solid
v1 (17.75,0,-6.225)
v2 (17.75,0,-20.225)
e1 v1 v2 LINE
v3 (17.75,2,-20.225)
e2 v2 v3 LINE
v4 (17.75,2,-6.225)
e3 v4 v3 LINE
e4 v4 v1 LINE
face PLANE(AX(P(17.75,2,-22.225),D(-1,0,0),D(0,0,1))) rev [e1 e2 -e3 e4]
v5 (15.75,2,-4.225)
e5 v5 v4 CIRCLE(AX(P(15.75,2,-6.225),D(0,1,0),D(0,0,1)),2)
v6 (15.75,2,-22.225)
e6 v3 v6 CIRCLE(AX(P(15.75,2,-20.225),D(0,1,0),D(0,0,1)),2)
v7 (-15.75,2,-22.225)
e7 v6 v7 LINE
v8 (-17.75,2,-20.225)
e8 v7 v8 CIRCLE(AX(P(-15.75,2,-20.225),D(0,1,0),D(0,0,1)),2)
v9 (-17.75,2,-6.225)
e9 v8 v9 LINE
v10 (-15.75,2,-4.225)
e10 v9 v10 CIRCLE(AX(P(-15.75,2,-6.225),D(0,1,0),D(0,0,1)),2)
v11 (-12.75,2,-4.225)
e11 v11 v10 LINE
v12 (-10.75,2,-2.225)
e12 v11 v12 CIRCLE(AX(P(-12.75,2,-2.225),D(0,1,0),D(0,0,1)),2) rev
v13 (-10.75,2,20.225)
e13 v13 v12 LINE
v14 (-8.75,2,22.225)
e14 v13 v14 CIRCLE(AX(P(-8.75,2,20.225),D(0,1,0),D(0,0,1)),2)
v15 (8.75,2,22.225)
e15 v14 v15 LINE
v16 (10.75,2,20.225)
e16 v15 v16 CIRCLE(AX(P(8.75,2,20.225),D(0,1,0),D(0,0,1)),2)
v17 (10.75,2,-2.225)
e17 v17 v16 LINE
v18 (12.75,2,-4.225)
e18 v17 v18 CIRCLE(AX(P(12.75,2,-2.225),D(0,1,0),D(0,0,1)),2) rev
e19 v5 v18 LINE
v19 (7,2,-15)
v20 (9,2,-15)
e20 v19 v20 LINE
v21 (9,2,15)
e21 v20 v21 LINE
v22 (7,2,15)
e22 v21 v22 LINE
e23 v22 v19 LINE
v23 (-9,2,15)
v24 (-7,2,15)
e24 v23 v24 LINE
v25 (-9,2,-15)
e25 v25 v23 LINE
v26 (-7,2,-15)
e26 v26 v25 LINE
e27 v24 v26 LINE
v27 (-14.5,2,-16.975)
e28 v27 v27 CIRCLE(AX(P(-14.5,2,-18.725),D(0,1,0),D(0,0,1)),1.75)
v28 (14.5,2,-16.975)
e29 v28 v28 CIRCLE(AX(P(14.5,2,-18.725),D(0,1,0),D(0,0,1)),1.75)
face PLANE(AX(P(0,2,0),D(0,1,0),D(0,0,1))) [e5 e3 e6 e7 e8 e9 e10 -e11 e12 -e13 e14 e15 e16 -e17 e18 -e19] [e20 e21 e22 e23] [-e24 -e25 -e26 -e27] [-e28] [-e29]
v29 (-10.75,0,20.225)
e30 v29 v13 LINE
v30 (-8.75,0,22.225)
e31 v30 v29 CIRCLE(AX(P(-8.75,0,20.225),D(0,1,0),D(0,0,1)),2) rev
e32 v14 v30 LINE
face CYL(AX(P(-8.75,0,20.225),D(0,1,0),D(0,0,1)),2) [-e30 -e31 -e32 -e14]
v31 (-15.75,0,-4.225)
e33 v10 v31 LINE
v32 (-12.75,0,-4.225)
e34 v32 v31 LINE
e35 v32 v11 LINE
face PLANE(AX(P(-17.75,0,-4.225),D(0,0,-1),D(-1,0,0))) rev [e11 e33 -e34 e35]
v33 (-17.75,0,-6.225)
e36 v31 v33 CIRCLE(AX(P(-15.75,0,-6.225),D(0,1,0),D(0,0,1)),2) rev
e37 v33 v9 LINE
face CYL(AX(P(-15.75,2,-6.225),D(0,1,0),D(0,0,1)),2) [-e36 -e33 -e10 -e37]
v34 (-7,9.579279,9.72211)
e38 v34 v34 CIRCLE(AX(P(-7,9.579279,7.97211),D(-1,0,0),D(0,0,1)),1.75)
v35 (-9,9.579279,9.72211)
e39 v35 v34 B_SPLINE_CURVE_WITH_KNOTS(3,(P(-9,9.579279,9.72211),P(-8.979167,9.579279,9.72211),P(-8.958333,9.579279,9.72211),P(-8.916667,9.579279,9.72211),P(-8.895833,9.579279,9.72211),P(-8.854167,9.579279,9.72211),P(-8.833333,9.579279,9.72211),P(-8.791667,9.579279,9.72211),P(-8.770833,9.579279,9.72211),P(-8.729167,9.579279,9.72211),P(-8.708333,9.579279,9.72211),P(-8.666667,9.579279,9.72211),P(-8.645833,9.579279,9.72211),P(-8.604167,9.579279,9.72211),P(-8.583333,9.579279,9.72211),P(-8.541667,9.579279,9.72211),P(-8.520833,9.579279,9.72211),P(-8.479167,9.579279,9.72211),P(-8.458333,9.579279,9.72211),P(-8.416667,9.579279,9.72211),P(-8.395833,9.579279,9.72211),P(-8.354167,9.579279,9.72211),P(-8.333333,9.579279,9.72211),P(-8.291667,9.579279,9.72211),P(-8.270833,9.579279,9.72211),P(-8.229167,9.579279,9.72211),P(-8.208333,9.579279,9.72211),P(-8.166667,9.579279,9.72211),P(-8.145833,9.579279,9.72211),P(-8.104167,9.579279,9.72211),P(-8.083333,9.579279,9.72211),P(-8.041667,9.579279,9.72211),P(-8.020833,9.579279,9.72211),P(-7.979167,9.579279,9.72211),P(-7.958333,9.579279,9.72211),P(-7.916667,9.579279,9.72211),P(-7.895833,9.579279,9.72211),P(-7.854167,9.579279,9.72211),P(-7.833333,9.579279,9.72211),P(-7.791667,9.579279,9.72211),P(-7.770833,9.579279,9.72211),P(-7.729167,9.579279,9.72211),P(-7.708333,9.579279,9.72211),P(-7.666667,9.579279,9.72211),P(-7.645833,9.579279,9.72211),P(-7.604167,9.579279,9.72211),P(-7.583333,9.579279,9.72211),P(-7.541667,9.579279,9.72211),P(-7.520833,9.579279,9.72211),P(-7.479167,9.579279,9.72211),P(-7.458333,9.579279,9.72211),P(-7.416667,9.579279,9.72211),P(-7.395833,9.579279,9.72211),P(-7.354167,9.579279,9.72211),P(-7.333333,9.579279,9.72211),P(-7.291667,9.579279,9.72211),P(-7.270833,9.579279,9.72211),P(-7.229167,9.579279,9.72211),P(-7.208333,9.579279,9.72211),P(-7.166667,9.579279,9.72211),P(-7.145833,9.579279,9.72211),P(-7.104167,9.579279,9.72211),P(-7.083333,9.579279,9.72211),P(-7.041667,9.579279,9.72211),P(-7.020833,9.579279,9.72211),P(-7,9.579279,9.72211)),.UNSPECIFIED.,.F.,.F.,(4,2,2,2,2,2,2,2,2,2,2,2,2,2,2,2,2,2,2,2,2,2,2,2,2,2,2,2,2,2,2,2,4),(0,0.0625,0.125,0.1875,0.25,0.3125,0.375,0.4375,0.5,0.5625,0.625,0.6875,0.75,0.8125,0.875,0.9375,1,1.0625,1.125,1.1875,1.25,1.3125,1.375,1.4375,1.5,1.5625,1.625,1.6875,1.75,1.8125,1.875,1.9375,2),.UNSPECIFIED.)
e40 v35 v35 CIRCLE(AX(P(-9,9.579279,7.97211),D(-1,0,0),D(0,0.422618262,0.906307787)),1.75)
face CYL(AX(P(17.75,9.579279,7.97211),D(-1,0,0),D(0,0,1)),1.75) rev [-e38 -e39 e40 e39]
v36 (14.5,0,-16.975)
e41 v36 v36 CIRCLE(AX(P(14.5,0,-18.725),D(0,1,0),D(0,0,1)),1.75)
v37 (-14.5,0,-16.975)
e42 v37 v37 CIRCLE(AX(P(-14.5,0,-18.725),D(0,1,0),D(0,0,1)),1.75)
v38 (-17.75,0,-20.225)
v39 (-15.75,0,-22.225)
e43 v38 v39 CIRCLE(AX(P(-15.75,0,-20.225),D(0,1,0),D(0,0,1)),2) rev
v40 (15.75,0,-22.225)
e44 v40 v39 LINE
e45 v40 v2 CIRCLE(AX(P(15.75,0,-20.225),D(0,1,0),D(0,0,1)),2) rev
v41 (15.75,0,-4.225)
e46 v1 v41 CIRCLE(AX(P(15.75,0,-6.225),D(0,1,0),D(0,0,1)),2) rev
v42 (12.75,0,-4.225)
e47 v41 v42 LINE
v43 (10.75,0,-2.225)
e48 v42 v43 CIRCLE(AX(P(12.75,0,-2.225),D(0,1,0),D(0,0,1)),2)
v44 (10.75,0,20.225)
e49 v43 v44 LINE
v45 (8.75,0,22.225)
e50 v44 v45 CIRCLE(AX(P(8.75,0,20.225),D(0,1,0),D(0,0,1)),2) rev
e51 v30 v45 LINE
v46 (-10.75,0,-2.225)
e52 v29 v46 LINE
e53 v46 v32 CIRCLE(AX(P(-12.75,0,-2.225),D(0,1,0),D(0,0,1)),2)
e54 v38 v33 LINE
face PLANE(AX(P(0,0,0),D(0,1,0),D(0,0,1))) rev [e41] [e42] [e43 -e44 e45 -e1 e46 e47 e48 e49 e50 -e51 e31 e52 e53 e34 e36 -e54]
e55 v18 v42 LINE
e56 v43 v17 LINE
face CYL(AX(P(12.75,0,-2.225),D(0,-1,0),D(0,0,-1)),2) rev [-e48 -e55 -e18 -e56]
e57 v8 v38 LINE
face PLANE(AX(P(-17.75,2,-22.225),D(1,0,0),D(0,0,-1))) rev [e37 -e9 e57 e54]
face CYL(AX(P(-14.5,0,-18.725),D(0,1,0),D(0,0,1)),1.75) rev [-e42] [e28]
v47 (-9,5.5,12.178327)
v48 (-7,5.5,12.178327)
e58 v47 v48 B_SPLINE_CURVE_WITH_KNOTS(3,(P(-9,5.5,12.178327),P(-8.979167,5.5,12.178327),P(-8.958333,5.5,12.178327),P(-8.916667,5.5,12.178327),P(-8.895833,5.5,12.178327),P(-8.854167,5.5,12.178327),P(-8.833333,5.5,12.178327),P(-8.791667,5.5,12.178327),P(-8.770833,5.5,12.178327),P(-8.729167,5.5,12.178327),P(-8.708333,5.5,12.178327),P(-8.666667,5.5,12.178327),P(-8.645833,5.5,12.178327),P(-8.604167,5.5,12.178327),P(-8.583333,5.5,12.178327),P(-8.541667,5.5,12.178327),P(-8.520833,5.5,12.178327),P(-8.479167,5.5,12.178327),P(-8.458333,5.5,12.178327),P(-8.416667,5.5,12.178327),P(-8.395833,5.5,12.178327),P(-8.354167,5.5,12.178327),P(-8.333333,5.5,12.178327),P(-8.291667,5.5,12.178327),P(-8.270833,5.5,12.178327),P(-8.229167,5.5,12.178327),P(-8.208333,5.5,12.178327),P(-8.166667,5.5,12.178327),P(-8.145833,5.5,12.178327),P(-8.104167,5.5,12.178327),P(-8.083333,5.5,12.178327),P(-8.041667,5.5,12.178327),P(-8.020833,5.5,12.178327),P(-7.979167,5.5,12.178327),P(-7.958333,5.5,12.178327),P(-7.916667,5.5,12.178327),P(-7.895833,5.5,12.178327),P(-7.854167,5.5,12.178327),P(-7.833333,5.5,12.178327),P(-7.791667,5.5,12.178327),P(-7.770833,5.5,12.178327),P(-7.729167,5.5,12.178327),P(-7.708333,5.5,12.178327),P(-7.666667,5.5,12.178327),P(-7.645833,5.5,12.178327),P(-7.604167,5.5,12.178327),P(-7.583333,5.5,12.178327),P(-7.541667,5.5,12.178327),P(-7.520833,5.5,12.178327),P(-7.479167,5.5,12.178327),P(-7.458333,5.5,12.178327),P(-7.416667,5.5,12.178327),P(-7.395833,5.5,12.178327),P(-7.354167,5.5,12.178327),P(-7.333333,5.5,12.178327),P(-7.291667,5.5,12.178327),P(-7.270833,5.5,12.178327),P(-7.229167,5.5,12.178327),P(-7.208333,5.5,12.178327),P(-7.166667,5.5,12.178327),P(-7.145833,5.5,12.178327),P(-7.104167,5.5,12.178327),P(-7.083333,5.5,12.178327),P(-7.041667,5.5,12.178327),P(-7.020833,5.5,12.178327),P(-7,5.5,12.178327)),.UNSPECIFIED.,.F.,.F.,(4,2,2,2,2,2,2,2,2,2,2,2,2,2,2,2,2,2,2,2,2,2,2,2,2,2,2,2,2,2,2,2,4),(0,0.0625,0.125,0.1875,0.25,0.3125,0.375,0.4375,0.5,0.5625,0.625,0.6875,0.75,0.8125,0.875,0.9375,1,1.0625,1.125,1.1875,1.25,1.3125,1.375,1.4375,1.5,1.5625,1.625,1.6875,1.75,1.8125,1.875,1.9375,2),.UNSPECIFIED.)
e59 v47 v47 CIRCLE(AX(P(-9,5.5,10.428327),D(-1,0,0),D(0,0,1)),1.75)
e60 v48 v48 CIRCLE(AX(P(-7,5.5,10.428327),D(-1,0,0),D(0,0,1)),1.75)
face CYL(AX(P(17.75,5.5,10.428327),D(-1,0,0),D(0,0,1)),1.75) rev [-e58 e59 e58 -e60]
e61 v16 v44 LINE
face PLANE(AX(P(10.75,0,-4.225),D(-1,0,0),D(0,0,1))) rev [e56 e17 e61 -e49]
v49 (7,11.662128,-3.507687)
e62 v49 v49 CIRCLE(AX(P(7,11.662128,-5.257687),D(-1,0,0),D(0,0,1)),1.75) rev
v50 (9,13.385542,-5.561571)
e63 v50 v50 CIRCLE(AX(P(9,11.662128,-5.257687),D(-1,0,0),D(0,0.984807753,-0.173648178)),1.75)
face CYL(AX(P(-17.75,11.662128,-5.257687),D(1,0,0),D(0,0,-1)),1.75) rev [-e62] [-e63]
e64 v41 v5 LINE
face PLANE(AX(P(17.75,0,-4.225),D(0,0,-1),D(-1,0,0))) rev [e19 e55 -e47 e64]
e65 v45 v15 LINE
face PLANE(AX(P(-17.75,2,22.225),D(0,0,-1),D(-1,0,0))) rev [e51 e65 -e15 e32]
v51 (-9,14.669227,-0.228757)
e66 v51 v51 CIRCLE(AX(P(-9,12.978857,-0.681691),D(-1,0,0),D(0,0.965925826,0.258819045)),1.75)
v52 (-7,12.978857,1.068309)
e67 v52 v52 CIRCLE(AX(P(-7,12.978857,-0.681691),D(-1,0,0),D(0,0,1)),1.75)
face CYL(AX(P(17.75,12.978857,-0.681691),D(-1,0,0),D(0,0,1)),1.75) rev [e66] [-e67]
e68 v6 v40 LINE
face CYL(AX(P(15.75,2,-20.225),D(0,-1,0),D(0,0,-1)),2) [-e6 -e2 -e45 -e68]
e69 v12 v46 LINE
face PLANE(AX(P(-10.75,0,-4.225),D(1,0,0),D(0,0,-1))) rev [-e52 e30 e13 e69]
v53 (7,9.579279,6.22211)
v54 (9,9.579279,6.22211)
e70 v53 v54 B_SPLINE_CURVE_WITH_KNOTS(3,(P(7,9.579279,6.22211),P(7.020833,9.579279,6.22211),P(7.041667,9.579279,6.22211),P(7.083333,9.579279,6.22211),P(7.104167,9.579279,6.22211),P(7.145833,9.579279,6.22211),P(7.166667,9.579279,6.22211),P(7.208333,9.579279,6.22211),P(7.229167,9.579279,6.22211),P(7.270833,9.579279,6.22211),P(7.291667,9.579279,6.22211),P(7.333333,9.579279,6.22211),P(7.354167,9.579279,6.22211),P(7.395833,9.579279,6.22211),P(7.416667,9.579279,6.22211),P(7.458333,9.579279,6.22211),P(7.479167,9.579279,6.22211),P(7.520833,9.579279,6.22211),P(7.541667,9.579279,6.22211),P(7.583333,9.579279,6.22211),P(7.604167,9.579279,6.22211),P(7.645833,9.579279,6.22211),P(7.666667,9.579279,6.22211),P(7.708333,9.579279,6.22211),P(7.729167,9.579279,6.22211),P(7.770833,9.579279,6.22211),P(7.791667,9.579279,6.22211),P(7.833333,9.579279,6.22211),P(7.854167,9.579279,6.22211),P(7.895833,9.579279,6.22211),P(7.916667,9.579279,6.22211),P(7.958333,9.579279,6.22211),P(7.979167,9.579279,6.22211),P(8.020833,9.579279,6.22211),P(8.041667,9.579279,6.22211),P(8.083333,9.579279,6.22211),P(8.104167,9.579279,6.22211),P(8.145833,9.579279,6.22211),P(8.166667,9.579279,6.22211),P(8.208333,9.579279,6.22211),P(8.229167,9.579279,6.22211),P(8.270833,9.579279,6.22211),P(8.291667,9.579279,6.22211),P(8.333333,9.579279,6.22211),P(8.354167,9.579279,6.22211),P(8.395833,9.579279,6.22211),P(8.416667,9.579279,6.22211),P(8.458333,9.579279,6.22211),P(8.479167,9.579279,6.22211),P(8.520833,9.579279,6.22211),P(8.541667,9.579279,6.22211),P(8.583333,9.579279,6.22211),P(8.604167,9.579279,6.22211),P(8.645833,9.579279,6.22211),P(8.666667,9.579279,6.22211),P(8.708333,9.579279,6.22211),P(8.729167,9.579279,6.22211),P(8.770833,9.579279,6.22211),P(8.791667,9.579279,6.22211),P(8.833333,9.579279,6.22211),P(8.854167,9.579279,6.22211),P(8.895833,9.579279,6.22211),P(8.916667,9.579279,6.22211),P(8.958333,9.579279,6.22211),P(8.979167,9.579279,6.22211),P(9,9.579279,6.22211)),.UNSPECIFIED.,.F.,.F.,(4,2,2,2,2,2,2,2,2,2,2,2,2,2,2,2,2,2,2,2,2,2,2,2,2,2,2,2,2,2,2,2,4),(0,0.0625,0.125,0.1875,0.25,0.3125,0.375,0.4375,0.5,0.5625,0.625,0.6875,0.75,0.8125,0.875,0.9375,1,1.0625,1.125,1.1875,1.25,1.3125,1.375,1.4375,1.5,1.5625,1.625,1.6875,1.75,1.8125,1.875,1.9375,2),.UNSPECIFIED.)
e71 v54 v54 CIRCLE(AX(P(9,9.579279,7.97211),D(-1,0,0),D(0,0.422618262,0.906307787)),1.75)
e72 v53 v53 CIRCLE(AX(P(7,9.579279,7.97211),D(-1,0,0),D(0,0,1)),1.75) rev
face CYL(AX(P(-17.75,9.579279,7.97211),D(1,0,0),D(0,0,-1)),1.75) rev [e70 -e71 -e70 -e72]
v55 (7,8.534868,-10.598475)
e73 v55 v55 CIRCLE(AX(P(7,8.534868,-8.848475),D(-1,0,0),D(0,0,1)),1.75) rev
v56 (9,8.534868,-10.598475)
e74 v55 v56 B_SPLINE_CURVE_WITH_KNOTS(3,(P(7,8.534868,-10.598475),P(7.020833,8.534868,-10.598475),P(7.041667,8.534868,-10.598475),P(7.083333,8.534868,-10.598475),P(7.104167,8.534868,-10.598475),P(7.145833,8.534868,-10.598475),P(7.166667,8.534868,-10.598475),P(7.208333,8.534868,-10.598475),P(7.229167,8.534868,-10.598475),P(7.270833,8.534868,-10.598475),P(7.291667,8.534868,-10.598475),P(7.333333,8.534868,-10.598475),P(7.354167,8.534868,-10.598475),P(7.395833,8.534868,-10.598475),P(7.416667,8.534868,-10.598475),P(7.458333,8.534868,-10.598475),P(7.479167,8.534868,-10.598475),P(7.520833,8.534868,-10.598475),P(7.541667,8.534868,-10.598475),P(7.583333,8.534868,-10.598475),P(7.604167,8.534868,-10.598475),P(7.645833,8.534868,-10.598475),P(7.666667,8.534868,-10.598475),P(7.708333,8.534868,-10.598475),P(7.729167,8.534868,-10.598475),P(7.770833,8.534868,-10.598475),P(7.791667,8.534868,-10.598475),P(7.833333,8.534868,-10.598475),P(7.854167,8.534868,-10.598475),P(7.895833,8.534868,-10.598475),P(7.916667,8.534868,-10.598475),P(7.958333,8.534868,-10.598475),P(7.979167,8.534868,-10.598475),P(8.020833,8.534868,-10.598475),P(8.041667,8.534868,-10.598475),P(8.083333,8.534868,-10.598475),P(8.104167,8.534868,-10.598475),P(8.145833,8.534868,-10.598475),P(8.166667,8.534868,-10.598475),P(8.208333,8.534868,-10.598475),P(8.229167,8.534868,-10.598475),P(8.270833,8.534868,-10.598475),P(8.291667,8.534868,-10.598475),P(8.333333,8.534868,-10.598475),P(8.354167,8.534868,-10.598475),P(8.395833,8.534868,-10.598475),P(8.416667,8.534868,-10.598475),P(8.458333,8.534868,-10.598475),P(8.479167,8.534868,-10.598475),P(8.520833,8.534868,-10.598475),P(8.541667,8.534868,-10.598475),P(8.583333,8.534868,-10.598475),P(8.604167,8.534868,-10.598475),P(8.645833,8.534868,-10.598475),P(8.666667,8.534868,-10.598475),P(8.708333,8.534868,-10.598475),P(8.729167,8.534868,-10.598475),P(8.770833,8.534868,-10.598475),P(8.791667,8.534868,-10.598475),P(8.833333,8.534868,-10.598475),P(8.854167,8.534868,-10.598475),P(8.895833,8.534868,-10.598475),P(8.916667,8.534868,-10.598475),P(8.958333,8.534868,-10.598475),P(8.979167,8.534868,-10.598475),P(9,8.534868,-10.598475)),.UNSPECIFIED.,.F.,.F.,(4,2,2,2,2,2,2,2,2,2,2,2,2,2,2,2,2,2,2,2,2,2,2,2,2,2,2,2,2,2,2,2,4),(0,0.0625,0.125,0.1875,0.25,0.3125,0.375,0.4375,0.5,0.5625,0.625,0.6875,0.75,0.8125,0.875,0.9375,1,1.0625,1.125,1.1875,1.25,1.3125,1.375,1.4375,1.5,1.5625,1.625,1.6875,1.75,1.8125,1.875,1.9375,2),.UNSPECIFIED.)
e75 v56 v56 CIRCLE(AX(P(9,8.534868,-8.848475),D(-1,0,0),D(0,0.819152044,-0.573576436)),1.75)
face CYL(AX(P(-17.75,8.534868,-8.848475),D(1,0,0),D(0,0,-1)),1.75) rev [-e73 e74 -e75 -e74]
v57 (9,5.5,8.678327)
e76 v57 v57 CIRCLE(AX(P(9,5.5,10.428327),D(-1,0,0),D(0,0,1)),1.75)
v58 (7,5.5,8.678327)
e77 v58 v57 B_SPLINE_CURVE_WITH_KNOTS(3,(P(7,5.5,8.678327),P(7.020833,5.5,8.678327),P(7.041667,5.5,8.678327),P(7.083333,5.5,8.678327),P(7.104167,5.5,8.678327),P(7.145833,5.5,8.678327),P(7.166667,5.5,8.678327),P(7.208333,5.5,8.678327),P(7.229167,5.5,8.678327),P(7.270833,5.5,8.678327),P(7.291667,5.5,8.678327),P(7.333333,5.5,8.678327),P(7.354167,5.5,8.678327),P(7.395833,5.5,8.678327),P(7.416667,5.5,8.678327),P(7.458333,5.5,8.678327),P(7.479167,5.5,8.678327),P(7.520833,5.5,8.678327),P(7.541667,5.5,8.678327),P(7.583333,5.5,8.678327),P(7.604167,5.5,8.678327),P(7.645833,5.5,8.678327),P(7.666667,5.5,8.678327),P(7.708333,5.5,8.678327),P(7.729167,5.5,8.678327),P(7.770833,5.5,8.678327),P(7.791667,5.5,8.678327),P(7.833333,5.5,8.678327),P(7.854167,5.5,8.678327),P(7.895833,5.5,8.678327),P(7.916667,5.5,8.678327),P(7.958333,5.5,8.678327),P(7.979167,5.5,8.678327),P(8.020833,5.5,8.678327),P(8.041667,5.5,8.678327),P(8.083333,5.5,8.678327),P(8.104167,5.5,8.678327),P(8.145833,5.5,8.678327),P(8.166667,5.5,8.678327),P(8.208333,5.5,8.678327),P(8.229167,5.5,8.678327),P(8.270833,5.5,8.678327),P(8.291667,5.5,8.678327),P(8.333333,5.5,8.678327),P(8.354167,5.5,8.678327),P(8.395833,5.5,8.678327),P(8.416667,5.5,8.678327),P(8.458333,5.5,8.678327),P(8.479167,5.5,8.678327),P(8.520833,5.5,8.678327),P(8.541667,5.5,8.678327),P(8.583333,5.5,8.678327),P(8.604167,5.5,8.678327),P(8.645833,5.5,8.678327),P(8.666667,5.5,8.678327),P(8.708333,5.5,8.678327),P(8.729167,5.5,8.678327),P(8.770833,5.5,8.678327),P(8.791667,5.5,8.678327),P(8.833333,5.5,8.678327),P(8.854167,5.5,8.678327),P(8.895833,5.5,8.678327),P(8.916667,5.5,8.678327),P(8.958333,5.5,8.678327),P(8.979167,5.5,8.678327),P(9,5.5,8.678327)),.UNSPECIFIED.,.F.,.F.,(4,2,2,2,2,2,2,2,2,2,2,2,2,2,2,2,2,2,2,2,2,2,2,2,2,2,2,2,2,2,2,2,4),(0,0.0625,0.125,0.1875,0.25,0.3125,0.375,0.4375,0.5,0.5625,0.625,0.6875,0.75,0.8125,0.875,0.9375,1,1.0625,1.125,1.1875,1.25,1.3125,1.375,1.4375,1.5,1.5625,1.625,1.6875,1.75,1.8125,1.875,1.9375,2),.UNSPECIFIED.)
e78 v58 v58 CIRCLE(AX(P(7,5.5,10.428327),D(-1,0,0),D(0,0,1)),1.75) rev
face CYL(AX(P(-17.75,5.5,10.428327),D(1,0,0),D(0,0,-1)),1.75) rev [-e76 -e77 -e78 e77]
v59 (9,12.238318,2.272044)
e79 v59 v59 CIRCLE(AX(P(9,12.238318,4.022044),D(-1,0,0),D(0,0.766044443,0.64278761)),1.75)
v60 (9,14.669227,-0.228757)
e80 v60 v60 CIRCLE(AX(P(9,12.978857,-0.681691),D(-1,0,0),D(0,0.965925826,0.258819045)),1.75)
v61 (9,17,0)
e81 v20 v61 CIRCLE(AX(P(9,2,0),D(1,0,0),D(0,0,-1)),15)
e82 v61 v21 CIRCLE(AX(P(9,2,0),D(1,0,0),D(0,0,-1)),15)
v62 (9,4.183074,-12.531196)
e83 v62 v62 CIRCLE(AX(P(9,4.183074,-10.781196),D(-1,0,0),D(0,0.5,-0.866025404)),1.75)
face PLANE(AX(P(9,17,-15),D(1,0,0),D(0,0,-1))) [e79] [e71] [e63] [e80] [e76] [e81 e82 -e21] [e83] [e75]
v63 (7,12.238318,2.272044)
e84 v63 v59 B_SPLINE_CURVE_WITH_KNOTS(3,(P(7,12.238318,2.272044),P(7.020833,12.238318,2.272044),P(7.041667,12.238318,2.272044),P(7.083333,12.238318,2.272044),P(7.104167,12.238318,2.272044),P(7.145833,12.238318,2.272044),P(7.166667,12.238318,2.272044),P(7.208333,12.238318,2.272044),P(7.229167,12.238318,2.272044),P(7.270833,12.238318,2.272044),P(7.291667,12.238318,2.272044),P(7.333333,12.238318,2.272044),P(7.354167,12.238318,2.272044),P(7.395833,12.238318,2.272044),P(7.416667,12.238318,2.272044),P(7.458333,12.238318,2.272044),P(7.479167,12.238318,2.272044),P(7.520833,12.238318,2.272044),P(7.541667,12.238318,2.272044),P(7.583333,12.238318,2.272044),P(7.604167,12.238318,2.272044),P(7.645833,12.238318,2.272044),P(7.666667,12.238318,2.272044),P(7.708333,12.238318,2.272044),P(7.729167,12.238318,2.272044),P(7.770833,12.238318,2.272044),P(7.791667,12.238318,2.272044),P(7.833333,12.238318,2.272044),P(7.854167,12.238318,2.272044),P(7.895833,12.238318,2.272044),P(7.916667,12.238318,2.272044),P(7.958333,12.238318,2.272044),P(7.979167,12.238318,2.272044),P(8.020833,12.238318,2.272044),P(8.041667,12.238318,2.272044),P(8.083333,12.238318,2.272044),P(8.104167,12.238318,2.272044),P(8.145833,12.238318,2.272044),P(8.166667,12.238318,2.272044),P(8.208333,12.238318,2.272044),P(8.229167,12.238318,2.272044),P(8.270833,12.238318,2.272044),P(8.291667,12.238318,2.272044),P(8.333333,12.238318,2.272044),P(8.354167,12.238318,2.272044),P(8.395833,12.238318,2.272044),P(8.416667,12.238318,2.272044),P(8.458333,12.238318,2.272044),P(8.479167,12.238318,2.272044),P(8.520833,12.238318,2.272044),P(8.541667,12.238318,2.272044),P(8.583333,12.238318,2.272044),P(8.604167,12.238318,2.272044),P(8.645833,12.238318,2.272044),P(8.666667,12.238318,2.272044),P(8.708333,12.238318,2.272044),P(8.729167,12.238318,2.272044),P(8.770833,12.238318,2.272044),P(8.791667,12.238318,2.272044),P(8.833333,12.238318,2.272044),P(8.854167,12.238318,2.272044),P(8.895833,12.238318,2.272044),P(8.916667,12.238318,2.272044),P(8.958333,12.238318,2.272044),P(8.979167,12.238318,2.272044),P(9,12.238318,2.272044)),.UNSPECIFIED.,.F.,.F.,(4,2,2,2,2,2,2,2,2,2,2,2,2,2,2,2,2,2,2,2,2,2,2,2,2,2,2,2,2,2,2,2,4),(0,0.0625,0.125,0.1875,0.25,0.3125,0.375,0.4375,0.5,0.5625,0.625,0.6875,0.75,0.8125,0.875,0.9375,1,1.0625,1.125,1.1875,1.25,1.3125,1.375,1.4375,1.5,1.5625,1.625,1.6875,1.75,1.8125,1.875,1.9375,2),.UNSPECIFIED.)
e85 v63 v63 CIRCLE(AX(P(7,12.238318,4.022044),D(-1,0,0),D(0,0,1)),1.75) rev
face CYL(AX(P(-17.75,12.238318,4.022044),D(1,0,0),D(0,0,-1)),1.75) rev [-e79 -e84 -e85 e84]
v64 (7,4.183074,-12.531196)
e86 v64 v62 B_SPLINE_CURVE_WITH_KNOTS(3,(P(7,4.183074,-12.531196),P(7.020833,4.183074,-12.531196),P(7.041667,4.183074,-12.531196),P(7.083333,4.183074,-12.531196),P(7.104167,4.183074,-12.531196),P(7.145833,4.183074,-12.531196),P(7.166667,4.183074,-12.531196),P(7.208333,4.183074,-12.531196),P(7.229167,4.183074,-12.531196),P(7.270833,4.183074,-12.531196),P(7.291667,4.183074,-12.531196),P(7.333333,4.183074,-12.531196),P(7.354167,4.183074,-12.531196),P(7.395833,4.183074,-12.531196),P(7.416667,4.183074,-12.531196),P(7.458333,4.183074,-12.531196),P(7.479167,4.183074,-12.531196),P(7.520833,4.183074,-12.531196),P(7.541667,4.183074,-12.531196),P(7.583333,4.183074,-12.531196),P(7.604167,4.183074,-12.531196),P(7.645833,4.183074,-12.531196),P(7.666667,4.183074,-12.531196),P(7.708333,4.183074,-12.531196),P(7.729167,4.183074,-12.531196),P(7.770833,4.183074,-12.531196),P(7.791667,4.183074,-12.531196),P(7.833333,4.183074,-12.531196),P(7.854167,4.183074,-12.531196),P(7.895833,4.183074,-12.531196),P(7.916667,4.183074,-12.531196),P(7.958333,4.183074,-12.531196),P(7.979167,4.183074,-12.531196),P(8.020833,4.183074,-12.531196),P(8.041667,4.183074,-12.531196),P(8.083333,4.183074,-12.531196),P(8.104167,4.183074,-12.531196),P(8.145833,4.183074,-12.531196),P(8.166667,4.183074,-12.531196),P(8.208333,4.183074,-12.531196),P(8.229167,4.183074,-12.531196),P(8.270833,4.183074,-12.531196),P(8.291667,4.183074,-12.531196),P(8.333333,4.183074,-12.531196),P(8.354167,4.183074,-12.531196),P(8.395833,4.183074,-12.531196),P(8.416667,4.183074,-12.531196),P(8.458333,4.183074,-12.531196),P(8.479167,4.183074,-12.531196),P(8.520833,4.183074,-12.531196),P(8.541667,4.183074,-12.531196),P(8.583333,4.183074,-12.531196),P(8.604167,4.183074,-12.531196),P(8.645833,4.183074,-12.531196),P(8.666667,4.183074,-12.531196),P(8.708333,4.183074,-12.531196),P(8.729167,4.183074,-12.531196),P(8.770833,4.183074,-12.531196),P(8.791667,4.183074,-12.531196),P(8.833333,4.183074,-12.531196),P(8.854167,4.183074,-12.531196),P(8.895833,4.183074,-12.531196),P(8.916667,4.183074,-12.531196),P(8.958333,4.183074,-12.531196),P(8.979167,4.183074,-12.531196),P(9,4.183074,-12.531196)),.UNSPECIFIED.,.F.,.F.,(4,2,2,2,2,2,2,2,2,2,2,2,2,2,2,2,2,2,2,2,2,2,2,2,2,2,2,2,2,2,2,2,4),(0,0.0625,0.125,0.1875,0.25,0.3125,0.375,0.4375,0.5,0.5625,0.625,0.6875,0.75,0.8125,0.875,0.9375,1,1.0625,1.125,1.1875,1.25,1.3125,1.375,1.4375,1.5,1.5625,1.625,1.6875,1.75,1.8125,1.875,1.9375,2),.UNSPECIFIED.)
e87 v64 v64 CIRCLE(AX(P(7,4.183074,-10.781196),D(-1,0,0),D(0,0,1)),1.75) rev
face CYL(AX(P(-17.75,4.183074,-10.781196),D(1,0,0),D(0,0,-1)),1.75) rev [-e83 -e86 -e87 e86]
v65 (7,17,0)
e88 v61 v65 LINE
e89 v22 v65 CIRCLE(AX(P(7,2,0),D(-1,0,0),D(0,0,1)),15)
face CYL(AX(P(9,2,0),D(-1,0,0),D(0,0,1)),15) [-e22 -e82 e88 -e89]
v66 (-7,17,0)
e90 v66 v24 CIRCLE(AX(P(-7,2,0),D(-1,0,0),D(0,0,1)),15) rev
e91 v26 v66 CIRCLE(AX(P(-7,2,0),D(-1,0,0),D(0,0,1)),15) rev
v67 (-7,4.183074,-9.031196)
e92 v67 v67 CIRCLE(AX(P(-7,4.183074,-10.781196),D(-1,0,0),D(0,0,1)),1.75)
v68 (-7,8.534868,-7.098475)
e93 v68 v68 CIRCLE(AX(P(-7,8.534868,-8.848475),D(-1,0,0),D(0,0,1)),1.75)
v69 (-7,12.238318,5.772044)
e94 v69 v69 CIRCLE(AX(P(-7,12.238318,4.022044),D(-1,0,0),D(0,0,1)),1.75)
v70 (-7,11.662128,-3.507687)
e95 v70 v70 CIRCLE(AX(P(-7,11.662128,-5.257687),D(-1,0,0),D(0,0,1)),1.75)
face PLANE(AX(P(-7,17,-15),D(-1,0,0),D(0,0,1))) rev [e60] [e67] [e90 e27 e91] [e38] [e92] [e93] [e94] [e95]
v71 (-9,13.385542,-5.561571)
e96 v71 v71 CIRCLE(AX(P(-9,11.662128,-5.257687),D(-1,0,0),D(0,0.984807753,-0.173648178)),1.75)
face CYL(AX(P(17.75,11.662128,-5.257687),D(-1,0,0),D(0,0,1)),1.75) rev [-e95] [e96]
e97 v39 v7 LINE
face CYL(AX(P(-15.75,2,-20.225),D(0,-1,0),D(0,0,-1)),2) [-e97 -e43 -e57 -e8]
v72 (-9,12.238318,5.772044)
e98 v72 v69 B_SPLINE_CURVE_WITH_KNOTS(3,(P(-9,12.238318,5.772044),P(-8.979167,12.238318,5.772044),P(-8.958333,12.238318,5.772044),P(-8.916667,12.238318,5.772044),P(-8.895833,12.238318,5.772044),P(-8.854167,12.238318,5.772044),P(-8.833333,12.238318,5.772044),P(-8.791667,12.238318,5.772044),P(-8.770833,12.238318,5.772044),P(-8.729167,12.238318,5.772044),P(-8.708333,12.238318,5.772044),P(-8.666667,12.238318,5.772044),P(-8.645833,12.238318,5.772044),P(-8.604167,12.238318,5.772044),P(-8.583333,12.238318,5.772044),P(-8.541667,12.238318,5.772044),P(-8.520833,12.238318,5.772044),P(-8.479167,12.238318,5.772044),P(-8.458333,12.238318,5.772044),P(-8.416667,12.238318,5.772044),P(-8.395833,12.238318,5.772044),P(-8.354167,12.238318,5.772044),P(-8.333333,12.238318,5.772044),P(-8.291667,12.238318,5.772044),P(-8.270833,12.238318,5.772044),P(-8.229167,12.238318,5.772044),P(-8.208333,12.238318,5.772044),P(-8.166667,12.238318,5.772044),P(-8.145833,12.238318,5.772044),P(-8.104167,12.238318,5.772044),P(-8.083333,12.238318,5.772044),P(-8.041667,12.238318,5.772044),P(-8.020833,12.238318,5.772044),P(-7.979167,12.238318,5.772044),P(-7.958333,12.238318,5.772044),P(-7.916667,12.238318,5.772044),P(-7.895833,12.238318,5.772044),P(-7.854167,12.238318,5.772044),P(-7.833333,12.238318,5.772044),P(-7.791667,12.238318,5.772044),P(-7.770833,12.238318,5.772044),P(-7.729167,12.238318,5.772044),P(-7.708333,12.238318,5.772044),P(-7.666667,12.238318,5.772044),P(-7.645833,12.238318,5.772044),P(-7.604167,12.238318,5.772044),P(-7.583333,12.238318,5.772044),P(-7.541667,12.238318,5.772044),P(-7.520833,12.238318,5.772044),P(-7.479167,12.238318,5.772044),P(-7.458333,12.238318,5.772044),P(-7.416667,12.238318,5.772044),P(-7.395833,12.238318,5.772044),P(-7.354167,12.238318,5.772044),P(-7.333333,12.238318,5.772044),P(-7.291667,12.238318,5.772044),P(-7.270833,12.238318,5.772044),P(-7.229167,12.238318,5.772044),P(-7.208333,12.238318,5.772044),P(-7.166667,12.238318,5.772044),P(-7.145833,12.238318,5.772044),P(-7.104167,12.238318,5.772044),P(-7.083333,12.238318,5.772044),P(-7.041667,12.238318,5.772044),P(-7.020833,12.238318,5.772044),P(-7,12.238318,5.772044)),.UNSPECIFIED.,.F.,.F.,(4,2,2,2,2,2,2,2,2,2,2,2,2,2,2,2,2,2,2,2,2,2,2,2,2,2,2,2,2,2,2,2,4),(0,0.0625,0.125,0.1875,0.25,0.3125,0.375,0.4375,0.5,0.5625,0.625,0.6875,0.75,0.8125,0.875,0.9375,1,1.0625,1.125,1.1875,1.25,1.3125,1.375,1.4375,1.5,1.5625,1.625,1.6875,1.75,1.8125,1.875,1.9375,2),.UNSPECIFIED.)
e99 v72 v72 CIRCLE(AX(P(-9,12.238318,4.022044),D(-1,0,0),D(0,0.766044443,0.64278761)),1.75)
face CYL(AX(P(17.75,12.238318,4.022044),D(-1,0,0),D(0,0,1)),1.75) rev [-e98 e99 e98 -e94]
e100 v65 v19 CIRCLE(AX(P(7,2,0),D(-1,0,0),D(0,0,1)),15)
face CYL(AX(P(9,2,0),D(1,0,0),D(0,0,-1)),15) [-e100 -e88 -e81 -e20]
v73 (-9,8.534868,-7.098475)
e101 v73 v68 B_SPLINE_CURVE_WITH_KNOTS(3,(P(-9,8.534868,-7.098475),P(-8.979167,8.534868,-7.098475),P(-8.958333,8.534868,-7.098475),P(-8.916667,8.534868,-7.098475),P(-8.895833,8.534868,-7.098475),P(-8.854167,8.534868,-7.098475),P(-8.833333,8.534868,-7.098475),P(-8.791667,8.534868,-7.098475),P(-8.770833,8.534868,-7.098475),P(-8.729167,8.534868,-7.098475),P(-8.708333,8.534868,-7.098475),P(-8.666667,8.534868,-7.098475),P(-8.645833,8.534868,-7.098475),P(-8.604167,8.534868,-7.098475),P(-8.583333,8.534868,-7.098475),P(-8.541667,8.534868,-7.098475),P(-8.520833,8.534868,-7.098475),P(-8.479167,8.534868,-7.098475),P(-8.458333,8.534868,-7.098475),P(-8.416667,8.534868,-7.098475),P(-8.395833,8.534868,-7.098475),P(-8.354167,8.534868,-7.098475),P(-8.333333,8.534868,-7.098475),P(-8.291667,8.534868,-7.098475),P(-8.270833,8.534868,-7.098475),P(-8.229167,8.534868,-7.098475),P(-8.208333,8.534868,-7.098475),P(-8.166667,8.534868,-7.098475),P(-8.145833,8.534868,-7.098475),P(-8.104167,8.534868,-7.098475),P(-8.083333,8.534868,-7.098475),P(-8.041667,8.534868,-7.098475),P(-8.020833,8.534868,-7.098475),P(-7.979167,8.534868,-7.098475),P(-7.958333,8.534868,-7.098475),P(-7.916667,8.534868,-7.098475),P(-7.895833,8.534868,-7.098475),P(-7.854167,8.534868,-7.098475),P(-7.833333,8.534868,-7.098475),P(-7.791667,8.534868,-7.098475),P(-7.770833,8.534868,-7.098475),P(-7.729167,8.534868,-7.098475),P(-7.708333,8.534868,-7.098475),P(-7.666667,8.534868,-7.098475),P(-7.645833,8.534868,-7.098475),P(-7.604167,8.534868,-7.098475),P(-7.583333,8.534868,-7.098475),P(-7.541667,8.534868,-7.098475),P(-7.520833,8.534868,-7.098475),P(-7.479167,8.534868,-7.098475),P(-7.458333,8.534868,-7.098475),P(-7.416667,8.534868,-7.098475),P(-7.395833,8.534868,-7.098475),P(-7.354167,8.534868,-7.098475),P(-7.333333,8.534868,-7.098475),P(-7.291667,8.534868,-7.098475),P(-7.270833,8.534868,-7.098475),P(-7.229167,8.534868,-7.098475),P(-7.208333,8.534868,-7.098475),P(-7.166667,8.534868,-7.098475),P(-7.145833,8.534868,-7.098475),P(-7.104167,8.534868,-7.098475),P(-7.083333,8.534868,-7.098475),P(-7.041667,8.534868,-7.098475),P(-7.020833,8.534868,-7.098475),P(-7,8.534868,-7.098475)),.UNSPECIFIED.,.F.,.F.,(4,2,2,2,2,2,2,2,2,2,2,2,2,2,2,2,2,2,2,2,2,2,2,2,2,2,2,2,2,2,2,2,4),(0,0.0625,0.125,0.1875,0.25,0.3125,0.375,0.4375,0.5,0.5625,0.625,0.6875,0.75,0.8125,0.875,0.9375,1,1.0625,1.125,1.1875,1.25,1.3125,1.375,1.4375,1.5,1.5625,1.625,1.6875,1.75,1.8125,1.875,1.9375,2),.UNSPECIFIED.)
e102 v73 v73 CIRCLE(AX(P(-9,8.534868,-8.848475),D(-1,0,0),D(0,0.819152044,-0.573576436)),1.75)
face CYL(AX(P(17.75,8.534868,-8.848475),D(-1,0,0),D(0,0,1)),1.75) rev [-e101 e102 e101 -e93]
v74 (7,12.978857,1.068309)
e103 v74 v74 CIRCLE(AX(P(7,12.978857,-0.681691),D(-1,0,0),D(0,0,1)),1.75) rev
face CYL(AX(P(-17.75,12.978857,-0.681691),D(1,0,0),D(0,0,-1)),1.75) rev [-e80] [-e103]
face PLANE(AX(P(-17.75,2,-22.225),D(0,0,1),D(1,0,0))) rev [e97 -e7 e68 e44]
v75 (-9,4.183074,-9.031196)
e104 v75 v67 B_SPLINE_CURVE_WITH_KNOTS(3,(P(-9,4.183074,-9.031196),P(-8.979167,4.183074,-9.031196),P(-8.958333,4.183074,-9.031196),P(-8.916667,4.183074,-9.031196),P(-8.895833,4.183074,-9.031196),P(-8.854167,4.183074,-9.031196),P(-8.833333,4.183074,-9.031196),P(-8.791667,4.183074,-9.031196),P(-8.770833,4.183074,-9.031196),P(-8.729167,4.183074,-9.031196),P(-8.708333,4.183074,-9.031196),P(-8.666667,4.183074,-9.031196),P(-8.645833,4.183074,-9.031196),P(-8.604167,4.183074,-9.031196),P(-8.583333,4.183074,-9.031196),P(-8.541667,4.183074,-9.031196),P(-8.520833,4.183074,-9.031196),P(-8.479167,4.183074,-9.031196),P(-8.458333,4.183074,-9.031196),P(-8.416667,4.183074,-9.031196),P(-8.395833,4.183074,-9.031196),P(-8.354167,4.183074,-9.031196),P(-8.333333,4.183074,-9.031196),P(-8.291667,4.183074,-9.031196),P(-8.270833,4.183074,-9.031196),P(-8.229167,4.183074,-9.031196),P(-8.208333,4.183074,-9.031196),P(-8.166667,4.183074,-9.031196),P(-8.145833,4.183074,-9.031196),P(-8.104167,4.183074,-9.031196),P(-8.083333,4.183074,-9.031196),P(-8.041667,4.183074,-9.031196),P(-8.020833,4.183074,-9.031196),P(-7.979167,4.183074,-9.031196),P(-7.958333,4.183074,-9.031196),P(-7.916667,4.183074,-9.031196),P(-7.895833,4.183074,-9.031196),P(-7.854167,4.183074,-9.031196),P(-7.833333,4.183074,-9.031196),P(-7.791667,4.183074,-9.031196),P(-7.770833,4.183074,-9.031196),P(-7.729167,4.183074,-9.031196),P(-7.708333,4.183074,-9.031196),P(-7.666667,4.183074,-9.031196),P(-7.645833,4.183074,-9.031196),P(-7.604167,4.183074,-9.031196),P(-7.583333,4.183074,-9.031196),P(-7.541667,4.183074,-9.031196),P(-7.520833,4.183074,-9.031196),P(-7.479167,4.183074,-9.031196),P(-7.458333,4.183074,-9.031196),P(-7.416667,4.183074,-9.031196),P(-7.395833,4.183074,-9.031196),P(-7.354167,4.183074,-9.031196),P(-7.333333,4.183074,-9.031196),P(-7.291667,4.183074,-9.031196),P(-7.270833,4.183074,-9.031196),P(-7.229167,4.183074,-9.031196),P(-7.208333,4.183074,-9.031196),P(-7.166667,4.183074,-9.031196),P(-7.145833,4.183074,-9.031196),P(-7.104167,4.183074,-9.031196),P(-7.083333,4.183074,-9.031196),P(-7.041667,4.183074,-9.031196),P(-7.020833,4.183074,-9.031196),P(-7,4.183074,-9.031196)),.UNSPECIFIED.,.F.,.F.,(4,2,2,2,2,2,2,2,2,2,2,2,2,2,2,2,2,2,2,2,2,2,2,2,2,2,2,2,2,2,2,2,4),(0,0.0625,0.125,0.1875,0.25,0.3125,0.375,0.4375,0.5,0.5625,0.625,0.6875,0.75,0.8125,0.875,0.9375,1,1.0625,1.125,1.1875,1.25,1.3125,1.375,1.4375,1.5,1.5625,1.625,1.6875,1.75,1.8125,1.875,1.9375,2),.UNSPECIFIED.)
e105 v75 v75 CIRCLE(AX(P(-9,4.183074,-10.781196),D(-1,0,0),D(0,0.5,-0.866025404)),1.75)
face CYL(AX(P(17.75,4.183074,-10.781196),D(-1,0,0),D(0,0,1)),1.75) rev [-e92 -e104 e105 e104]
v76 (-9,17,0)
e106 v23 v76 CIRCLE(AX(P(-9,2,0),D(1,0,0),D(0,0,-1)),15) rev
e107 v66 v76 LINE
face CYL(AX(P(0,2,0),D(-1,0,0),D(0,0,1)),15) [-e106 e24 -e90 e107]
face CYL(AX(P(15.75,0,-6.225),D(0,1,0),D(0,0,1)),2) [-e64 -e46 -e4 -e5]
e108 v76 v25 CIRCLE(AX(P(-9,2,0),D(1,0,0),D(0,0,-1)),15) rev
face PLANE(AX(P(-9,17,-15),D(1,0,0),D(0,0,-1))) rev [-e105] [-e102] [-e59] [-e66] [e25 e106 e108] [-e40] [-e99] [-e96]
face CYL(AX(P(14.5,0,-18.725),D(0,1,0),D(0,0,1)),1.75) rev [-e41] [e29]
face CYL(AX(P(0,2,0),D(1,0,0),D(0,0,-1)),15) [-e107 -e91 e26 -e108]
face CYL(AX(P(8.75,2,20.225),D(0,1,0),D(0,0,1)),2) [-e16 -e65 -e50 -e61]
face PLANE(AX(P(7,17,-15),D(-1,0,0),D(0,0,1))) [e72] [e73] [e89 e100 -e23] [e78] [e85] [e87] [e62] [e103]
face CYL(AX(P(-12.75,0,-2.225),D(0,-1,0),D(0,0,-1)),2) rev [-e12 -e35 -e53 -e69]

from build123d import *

# Parameters (mm, degrees)
SKETCH1_W               = 35.5
SKETCH1_H               = 44.45
BOSS_EXTRUDE1_DEPTH     = 2
SKETCH2_R               = 1.75
CUT_EXTRUDE1_DEPTH      = 29.513385015
SKETCH3_W               = 7
SKETCH3_H               = 26.45
CUT_EXTRUDE2_DEPTH      = 29.513385015
FILLET1_R               = 2
SKETCH4_W               = 2
SKETCH4_H               = 30
BOSS_EXTRUDE3_DEPTH     = 15
FILLET2_R               = 15
SKETCH5_R               = 1.75
CUT_EXTRUDE3_DEPTH      = 39.710633229
CIRPATTERN1_COUNT       = 7
CIRPATTERN1_ANGLE       = 150
MIRROR1_COPY_1_SKETCH_R = 1.75
MIRROR1_COPY_1_DEPTH    = 39.710633229
MIRROR1_COPY_2_SKETCH_R = 1.75
MIRROR1_COPY_2_DEPTH    = 39.710633229
MIRROR1_COPY_3_SKETCH_R = 1.75
MIRROR1_COPY_3_DEPTH    = 39.710633229
MIRROR1_COPY_4_SKETCH_R = 1.75
MIRROR1_COPY_4_DEPTH    = 39.710633229
MIRROR1_COPY_5_SKETCH_R = 1.75
MIRROR1_COPY_5_DEPTH    = 39.710633229
MIRROR1_COPY_6_SKETCH_R = 1.75
MIRROR1_COPY_6_DEPTH    = 39.710633229
FILLET2_OF_MIRROR1_R    = 15


with BuildPart() as part:
    # Sketch1 → Boss-Extrude1 (new body)
    with BuildSketch(Plane(origin=(0, 0, 0), x_dir=(1, 0, 0), z_dir=(0, 1, 0))):
        Rectangle(SKETCH1_W, SKETCH1_H)
    extrude(amount=BOSS_EXTRUDE1_DEPTH)

    # Sketch2 → Cut-Extrude1 (cut, through all)
    with BuildSketch(Plane(origin=(0, 2, 0), x_dir=(1, 0, 0), z_dir=(0, 1, 0))):
        with Locations(Location((-14.5, 18.725, 0), (0, 0, 270))):
            Circle(SKETCH2_R)
        with Locations(Location((14.5, 18.725, 0), (0, 0, 270))):
            Circle(SKETCH2_R)
    extrude(amount=-CUT_EXTRUDE1_DEPTH, mode=Mode.SUBTRACT)

    # Sketch3 → Cut-Extrude2 (cut, through all)
    with BuildSketch(Plane(origin=(0, 2, 0), x_dir=(1, 0, 0), z_dir=(0, 1, 0))):
        with Locations((-14.25, -9)):
            Rectangle(SKETCH3_W, SKETCH3_H)
        with Locations((14.25, -9)):
            Rectangle(SKETCH3_W, SKETCH3_H)
    extrude(amount=-CUT_EXTRUDE2_DEPTH, mode=Mode.SUBTRACT)

    # Fillet1
    fillet1_edges = [part.edges().sort_by_distance(p)[0] for p in [
        (-17.75, 1, -4.225),
        (-10.75, 1, -4.225),
        (-10.75, 1, 22.225),
        (17.75, 1, -4.225),
        (10.75, 1, 22.225),
        (10.75, 1, -4.225),
        (-17.75, 1, -22.225),
        (17.75, 1, -22.225),
    ]]
    fillet(fillet1_edges, radius=FILLET1_R)

    # Sketch4 → Boss-Extrude3 (add)
    with BuildSketch(Plane(origin=(0, 2, 0), x_dir=(1, 0, 0), z_dir=(0, 1, 0))):
        with Locations((-8, 0)):
            Rectangle(SKETCH4_W, SKETCH4_H)
    boss_extrude3 = extrude(amount=BOSS_EXTRUDE3_DEPTH)

    # Fillet2
    fillet2_edges = [part.edges().sort_by_distance(p)[0] for p in [
        (-8, 17, 15),
        (-8, 17, -15),
    ]]
    fillet(fillet2_edges, radius=FILLET2_R - 0.0001)  # a hair under: the kernel refuses the full size

    # Sketch5 → Cut-Extrude3 (cut, through all)
    with BuildSketch(Plane.ZY.offset(9)):
        with Locations((10.428326807, 5.5)):
            Circle(SKETCH5_R)
    cut_extrude3 = extrude(amount=-CUT_EXTRUDE3_DEPTH, mode=Mode.SUBTRACT)

    # CirPattern1: Cut-Extrude3 ×7 about axis
    cirpattern1_axis = Axis((0, 2, 0), (-1, 0, 0))
    for i in range(1, CIRPATTERN1_COUNT):
        add(cut_extrude3.rotate(cirpattern1_axis, i * CIRPATTERN1_ANGLE / (CIRPATTERN1_COUNT - 1)), mode=Mode.SUBTRACT)

    # Mirror1: Boss-Extrude3, Cut-Extrude3 across plane
    add(boss_extrude3.mirror(Plane(origin=(0, 0, 0), x_dir=(0, 0, 1), z_dir=(1, 0, 0))))
    add(cut_extrude3.mirror(Plane(origin=(0, 0, 0), x_dir=(0, 0, 1), z_dir=(1, 0, 0))), mode=Mode.SUBTRACT)

    # Mirror1 copy 1 sketch → Mirror1 copy 1 (cut, through all)
    with BuildSketch(Plane(origin=(9, 0.187384426, 0.845236523), x_dir=(0, 0.42261826174070033, 0.9063077870366495), z_dir=(1, 0, 0))):
        with Locations((10.428326807, -5.5)):
            Circle(MIRROR1_COPY_1_SKETCH_R)
    extrude(amount=-MIRROR1_COPY_1_DEPTH, mode=Mode.SUBTRACT)

    # Mirror1 copy 2 sketch → Mirror1 copy 2 (cut, through all)
    with BuildSketch(Plane(origin=(9, 0.714424781, 1.532088886), x_dir=(0, 0.7660444431189793, 0.6427876096865378), z_dir=(1, 0, 0))):
        with Locations((10.428326807, -5.5)):
            Circle(MIRROR1_COPY_2_SKETCH_R)
    extrude(amount=-MIRROR1_COPY_2_DEPTH, mode=Mode.SUBTRACT)

    # Mirror1 copy 3 sketch → Mirror1 copy 3 (cut, through all)
    with BuildSketch(Plane(origin=(9, 1.48236191, 1.931851653), x_dir=(0, 0.9659258262890691, 0.25881904510251796), z_dir=(1, 0, 0))):
        with Locations((10.428326807, -5.5)):
            Circle(MIRROR1_COPY_3_SKETCH_R)
    extrude(amount=-MIRROR1_COPY_3_DEPTH, mode=Mode.SUBTRACT)

    # Mirror1 copy 4 sketch → Mirror1 copy 4 (cut, through all)
    with BuildSketch(Plane(origin=(9, 2.347296355, 1.969615506), x_dir=(0, 0.9848077530122074, -0.17364817766693424), z_dir=(1, 0, 0))):
        with Locations((10.428326807, -5.5)):
            Circle(MIRROR1_COPY_4_SKETCH_R)
    extrude(amount=-MIRROR1_COPY_4_DEPTH, mode=Mode.SUBTRACT)

    # Mirror1 copy 5 sketch → Mirror1 copy 5 (cut, through all)
    with BuildSketch(Plane(origin=(9, 3.147152873, 1.638304089), x_dir=(0, 0.8191520442889889, -0.5735764363510502), z_dir=(1, 0, 0))):
        with Locations((10.428326807, -5.5)):
            Circle(MIRROR1_COPY_5_SKETCH_R)
    extrude(amount=-MIRROR1_COPY_5_DEPTH, mode=Mode.SUBTRACT)

    # Mirror1 copy 6 sketch → Mirror1 copy 6 (cut, through all)
    with BuildSketch(Plane(origin=(9, 3.732050808, 1), x_dir=(0, 0.49999999999999495, -0.8660254037844416), z_dir=(1, 0, 0))):
        with Locations((10.428326807, -5.5)):
            Circle(MIRROR1_COPY_6_SKETCH_R)
    extrude(amount=-MIRROR1_COPY_6_DEPTH, mode=Mode.SUBTRACT)

    # Fillet2 of Mirror1
    fillet2_of_mirror1_edges = [part.edges().sort_by_distance(p)[0] for p in [
        (8, 17, 15),
        (8, 17, -15),
    ]]
    fillet(fillet2_of_mirror1_edges, radius=FILLET2_OF_MIRROR1_R - 0.0001)  # a hair under: the kernel refuses the full size


solid = part.part
